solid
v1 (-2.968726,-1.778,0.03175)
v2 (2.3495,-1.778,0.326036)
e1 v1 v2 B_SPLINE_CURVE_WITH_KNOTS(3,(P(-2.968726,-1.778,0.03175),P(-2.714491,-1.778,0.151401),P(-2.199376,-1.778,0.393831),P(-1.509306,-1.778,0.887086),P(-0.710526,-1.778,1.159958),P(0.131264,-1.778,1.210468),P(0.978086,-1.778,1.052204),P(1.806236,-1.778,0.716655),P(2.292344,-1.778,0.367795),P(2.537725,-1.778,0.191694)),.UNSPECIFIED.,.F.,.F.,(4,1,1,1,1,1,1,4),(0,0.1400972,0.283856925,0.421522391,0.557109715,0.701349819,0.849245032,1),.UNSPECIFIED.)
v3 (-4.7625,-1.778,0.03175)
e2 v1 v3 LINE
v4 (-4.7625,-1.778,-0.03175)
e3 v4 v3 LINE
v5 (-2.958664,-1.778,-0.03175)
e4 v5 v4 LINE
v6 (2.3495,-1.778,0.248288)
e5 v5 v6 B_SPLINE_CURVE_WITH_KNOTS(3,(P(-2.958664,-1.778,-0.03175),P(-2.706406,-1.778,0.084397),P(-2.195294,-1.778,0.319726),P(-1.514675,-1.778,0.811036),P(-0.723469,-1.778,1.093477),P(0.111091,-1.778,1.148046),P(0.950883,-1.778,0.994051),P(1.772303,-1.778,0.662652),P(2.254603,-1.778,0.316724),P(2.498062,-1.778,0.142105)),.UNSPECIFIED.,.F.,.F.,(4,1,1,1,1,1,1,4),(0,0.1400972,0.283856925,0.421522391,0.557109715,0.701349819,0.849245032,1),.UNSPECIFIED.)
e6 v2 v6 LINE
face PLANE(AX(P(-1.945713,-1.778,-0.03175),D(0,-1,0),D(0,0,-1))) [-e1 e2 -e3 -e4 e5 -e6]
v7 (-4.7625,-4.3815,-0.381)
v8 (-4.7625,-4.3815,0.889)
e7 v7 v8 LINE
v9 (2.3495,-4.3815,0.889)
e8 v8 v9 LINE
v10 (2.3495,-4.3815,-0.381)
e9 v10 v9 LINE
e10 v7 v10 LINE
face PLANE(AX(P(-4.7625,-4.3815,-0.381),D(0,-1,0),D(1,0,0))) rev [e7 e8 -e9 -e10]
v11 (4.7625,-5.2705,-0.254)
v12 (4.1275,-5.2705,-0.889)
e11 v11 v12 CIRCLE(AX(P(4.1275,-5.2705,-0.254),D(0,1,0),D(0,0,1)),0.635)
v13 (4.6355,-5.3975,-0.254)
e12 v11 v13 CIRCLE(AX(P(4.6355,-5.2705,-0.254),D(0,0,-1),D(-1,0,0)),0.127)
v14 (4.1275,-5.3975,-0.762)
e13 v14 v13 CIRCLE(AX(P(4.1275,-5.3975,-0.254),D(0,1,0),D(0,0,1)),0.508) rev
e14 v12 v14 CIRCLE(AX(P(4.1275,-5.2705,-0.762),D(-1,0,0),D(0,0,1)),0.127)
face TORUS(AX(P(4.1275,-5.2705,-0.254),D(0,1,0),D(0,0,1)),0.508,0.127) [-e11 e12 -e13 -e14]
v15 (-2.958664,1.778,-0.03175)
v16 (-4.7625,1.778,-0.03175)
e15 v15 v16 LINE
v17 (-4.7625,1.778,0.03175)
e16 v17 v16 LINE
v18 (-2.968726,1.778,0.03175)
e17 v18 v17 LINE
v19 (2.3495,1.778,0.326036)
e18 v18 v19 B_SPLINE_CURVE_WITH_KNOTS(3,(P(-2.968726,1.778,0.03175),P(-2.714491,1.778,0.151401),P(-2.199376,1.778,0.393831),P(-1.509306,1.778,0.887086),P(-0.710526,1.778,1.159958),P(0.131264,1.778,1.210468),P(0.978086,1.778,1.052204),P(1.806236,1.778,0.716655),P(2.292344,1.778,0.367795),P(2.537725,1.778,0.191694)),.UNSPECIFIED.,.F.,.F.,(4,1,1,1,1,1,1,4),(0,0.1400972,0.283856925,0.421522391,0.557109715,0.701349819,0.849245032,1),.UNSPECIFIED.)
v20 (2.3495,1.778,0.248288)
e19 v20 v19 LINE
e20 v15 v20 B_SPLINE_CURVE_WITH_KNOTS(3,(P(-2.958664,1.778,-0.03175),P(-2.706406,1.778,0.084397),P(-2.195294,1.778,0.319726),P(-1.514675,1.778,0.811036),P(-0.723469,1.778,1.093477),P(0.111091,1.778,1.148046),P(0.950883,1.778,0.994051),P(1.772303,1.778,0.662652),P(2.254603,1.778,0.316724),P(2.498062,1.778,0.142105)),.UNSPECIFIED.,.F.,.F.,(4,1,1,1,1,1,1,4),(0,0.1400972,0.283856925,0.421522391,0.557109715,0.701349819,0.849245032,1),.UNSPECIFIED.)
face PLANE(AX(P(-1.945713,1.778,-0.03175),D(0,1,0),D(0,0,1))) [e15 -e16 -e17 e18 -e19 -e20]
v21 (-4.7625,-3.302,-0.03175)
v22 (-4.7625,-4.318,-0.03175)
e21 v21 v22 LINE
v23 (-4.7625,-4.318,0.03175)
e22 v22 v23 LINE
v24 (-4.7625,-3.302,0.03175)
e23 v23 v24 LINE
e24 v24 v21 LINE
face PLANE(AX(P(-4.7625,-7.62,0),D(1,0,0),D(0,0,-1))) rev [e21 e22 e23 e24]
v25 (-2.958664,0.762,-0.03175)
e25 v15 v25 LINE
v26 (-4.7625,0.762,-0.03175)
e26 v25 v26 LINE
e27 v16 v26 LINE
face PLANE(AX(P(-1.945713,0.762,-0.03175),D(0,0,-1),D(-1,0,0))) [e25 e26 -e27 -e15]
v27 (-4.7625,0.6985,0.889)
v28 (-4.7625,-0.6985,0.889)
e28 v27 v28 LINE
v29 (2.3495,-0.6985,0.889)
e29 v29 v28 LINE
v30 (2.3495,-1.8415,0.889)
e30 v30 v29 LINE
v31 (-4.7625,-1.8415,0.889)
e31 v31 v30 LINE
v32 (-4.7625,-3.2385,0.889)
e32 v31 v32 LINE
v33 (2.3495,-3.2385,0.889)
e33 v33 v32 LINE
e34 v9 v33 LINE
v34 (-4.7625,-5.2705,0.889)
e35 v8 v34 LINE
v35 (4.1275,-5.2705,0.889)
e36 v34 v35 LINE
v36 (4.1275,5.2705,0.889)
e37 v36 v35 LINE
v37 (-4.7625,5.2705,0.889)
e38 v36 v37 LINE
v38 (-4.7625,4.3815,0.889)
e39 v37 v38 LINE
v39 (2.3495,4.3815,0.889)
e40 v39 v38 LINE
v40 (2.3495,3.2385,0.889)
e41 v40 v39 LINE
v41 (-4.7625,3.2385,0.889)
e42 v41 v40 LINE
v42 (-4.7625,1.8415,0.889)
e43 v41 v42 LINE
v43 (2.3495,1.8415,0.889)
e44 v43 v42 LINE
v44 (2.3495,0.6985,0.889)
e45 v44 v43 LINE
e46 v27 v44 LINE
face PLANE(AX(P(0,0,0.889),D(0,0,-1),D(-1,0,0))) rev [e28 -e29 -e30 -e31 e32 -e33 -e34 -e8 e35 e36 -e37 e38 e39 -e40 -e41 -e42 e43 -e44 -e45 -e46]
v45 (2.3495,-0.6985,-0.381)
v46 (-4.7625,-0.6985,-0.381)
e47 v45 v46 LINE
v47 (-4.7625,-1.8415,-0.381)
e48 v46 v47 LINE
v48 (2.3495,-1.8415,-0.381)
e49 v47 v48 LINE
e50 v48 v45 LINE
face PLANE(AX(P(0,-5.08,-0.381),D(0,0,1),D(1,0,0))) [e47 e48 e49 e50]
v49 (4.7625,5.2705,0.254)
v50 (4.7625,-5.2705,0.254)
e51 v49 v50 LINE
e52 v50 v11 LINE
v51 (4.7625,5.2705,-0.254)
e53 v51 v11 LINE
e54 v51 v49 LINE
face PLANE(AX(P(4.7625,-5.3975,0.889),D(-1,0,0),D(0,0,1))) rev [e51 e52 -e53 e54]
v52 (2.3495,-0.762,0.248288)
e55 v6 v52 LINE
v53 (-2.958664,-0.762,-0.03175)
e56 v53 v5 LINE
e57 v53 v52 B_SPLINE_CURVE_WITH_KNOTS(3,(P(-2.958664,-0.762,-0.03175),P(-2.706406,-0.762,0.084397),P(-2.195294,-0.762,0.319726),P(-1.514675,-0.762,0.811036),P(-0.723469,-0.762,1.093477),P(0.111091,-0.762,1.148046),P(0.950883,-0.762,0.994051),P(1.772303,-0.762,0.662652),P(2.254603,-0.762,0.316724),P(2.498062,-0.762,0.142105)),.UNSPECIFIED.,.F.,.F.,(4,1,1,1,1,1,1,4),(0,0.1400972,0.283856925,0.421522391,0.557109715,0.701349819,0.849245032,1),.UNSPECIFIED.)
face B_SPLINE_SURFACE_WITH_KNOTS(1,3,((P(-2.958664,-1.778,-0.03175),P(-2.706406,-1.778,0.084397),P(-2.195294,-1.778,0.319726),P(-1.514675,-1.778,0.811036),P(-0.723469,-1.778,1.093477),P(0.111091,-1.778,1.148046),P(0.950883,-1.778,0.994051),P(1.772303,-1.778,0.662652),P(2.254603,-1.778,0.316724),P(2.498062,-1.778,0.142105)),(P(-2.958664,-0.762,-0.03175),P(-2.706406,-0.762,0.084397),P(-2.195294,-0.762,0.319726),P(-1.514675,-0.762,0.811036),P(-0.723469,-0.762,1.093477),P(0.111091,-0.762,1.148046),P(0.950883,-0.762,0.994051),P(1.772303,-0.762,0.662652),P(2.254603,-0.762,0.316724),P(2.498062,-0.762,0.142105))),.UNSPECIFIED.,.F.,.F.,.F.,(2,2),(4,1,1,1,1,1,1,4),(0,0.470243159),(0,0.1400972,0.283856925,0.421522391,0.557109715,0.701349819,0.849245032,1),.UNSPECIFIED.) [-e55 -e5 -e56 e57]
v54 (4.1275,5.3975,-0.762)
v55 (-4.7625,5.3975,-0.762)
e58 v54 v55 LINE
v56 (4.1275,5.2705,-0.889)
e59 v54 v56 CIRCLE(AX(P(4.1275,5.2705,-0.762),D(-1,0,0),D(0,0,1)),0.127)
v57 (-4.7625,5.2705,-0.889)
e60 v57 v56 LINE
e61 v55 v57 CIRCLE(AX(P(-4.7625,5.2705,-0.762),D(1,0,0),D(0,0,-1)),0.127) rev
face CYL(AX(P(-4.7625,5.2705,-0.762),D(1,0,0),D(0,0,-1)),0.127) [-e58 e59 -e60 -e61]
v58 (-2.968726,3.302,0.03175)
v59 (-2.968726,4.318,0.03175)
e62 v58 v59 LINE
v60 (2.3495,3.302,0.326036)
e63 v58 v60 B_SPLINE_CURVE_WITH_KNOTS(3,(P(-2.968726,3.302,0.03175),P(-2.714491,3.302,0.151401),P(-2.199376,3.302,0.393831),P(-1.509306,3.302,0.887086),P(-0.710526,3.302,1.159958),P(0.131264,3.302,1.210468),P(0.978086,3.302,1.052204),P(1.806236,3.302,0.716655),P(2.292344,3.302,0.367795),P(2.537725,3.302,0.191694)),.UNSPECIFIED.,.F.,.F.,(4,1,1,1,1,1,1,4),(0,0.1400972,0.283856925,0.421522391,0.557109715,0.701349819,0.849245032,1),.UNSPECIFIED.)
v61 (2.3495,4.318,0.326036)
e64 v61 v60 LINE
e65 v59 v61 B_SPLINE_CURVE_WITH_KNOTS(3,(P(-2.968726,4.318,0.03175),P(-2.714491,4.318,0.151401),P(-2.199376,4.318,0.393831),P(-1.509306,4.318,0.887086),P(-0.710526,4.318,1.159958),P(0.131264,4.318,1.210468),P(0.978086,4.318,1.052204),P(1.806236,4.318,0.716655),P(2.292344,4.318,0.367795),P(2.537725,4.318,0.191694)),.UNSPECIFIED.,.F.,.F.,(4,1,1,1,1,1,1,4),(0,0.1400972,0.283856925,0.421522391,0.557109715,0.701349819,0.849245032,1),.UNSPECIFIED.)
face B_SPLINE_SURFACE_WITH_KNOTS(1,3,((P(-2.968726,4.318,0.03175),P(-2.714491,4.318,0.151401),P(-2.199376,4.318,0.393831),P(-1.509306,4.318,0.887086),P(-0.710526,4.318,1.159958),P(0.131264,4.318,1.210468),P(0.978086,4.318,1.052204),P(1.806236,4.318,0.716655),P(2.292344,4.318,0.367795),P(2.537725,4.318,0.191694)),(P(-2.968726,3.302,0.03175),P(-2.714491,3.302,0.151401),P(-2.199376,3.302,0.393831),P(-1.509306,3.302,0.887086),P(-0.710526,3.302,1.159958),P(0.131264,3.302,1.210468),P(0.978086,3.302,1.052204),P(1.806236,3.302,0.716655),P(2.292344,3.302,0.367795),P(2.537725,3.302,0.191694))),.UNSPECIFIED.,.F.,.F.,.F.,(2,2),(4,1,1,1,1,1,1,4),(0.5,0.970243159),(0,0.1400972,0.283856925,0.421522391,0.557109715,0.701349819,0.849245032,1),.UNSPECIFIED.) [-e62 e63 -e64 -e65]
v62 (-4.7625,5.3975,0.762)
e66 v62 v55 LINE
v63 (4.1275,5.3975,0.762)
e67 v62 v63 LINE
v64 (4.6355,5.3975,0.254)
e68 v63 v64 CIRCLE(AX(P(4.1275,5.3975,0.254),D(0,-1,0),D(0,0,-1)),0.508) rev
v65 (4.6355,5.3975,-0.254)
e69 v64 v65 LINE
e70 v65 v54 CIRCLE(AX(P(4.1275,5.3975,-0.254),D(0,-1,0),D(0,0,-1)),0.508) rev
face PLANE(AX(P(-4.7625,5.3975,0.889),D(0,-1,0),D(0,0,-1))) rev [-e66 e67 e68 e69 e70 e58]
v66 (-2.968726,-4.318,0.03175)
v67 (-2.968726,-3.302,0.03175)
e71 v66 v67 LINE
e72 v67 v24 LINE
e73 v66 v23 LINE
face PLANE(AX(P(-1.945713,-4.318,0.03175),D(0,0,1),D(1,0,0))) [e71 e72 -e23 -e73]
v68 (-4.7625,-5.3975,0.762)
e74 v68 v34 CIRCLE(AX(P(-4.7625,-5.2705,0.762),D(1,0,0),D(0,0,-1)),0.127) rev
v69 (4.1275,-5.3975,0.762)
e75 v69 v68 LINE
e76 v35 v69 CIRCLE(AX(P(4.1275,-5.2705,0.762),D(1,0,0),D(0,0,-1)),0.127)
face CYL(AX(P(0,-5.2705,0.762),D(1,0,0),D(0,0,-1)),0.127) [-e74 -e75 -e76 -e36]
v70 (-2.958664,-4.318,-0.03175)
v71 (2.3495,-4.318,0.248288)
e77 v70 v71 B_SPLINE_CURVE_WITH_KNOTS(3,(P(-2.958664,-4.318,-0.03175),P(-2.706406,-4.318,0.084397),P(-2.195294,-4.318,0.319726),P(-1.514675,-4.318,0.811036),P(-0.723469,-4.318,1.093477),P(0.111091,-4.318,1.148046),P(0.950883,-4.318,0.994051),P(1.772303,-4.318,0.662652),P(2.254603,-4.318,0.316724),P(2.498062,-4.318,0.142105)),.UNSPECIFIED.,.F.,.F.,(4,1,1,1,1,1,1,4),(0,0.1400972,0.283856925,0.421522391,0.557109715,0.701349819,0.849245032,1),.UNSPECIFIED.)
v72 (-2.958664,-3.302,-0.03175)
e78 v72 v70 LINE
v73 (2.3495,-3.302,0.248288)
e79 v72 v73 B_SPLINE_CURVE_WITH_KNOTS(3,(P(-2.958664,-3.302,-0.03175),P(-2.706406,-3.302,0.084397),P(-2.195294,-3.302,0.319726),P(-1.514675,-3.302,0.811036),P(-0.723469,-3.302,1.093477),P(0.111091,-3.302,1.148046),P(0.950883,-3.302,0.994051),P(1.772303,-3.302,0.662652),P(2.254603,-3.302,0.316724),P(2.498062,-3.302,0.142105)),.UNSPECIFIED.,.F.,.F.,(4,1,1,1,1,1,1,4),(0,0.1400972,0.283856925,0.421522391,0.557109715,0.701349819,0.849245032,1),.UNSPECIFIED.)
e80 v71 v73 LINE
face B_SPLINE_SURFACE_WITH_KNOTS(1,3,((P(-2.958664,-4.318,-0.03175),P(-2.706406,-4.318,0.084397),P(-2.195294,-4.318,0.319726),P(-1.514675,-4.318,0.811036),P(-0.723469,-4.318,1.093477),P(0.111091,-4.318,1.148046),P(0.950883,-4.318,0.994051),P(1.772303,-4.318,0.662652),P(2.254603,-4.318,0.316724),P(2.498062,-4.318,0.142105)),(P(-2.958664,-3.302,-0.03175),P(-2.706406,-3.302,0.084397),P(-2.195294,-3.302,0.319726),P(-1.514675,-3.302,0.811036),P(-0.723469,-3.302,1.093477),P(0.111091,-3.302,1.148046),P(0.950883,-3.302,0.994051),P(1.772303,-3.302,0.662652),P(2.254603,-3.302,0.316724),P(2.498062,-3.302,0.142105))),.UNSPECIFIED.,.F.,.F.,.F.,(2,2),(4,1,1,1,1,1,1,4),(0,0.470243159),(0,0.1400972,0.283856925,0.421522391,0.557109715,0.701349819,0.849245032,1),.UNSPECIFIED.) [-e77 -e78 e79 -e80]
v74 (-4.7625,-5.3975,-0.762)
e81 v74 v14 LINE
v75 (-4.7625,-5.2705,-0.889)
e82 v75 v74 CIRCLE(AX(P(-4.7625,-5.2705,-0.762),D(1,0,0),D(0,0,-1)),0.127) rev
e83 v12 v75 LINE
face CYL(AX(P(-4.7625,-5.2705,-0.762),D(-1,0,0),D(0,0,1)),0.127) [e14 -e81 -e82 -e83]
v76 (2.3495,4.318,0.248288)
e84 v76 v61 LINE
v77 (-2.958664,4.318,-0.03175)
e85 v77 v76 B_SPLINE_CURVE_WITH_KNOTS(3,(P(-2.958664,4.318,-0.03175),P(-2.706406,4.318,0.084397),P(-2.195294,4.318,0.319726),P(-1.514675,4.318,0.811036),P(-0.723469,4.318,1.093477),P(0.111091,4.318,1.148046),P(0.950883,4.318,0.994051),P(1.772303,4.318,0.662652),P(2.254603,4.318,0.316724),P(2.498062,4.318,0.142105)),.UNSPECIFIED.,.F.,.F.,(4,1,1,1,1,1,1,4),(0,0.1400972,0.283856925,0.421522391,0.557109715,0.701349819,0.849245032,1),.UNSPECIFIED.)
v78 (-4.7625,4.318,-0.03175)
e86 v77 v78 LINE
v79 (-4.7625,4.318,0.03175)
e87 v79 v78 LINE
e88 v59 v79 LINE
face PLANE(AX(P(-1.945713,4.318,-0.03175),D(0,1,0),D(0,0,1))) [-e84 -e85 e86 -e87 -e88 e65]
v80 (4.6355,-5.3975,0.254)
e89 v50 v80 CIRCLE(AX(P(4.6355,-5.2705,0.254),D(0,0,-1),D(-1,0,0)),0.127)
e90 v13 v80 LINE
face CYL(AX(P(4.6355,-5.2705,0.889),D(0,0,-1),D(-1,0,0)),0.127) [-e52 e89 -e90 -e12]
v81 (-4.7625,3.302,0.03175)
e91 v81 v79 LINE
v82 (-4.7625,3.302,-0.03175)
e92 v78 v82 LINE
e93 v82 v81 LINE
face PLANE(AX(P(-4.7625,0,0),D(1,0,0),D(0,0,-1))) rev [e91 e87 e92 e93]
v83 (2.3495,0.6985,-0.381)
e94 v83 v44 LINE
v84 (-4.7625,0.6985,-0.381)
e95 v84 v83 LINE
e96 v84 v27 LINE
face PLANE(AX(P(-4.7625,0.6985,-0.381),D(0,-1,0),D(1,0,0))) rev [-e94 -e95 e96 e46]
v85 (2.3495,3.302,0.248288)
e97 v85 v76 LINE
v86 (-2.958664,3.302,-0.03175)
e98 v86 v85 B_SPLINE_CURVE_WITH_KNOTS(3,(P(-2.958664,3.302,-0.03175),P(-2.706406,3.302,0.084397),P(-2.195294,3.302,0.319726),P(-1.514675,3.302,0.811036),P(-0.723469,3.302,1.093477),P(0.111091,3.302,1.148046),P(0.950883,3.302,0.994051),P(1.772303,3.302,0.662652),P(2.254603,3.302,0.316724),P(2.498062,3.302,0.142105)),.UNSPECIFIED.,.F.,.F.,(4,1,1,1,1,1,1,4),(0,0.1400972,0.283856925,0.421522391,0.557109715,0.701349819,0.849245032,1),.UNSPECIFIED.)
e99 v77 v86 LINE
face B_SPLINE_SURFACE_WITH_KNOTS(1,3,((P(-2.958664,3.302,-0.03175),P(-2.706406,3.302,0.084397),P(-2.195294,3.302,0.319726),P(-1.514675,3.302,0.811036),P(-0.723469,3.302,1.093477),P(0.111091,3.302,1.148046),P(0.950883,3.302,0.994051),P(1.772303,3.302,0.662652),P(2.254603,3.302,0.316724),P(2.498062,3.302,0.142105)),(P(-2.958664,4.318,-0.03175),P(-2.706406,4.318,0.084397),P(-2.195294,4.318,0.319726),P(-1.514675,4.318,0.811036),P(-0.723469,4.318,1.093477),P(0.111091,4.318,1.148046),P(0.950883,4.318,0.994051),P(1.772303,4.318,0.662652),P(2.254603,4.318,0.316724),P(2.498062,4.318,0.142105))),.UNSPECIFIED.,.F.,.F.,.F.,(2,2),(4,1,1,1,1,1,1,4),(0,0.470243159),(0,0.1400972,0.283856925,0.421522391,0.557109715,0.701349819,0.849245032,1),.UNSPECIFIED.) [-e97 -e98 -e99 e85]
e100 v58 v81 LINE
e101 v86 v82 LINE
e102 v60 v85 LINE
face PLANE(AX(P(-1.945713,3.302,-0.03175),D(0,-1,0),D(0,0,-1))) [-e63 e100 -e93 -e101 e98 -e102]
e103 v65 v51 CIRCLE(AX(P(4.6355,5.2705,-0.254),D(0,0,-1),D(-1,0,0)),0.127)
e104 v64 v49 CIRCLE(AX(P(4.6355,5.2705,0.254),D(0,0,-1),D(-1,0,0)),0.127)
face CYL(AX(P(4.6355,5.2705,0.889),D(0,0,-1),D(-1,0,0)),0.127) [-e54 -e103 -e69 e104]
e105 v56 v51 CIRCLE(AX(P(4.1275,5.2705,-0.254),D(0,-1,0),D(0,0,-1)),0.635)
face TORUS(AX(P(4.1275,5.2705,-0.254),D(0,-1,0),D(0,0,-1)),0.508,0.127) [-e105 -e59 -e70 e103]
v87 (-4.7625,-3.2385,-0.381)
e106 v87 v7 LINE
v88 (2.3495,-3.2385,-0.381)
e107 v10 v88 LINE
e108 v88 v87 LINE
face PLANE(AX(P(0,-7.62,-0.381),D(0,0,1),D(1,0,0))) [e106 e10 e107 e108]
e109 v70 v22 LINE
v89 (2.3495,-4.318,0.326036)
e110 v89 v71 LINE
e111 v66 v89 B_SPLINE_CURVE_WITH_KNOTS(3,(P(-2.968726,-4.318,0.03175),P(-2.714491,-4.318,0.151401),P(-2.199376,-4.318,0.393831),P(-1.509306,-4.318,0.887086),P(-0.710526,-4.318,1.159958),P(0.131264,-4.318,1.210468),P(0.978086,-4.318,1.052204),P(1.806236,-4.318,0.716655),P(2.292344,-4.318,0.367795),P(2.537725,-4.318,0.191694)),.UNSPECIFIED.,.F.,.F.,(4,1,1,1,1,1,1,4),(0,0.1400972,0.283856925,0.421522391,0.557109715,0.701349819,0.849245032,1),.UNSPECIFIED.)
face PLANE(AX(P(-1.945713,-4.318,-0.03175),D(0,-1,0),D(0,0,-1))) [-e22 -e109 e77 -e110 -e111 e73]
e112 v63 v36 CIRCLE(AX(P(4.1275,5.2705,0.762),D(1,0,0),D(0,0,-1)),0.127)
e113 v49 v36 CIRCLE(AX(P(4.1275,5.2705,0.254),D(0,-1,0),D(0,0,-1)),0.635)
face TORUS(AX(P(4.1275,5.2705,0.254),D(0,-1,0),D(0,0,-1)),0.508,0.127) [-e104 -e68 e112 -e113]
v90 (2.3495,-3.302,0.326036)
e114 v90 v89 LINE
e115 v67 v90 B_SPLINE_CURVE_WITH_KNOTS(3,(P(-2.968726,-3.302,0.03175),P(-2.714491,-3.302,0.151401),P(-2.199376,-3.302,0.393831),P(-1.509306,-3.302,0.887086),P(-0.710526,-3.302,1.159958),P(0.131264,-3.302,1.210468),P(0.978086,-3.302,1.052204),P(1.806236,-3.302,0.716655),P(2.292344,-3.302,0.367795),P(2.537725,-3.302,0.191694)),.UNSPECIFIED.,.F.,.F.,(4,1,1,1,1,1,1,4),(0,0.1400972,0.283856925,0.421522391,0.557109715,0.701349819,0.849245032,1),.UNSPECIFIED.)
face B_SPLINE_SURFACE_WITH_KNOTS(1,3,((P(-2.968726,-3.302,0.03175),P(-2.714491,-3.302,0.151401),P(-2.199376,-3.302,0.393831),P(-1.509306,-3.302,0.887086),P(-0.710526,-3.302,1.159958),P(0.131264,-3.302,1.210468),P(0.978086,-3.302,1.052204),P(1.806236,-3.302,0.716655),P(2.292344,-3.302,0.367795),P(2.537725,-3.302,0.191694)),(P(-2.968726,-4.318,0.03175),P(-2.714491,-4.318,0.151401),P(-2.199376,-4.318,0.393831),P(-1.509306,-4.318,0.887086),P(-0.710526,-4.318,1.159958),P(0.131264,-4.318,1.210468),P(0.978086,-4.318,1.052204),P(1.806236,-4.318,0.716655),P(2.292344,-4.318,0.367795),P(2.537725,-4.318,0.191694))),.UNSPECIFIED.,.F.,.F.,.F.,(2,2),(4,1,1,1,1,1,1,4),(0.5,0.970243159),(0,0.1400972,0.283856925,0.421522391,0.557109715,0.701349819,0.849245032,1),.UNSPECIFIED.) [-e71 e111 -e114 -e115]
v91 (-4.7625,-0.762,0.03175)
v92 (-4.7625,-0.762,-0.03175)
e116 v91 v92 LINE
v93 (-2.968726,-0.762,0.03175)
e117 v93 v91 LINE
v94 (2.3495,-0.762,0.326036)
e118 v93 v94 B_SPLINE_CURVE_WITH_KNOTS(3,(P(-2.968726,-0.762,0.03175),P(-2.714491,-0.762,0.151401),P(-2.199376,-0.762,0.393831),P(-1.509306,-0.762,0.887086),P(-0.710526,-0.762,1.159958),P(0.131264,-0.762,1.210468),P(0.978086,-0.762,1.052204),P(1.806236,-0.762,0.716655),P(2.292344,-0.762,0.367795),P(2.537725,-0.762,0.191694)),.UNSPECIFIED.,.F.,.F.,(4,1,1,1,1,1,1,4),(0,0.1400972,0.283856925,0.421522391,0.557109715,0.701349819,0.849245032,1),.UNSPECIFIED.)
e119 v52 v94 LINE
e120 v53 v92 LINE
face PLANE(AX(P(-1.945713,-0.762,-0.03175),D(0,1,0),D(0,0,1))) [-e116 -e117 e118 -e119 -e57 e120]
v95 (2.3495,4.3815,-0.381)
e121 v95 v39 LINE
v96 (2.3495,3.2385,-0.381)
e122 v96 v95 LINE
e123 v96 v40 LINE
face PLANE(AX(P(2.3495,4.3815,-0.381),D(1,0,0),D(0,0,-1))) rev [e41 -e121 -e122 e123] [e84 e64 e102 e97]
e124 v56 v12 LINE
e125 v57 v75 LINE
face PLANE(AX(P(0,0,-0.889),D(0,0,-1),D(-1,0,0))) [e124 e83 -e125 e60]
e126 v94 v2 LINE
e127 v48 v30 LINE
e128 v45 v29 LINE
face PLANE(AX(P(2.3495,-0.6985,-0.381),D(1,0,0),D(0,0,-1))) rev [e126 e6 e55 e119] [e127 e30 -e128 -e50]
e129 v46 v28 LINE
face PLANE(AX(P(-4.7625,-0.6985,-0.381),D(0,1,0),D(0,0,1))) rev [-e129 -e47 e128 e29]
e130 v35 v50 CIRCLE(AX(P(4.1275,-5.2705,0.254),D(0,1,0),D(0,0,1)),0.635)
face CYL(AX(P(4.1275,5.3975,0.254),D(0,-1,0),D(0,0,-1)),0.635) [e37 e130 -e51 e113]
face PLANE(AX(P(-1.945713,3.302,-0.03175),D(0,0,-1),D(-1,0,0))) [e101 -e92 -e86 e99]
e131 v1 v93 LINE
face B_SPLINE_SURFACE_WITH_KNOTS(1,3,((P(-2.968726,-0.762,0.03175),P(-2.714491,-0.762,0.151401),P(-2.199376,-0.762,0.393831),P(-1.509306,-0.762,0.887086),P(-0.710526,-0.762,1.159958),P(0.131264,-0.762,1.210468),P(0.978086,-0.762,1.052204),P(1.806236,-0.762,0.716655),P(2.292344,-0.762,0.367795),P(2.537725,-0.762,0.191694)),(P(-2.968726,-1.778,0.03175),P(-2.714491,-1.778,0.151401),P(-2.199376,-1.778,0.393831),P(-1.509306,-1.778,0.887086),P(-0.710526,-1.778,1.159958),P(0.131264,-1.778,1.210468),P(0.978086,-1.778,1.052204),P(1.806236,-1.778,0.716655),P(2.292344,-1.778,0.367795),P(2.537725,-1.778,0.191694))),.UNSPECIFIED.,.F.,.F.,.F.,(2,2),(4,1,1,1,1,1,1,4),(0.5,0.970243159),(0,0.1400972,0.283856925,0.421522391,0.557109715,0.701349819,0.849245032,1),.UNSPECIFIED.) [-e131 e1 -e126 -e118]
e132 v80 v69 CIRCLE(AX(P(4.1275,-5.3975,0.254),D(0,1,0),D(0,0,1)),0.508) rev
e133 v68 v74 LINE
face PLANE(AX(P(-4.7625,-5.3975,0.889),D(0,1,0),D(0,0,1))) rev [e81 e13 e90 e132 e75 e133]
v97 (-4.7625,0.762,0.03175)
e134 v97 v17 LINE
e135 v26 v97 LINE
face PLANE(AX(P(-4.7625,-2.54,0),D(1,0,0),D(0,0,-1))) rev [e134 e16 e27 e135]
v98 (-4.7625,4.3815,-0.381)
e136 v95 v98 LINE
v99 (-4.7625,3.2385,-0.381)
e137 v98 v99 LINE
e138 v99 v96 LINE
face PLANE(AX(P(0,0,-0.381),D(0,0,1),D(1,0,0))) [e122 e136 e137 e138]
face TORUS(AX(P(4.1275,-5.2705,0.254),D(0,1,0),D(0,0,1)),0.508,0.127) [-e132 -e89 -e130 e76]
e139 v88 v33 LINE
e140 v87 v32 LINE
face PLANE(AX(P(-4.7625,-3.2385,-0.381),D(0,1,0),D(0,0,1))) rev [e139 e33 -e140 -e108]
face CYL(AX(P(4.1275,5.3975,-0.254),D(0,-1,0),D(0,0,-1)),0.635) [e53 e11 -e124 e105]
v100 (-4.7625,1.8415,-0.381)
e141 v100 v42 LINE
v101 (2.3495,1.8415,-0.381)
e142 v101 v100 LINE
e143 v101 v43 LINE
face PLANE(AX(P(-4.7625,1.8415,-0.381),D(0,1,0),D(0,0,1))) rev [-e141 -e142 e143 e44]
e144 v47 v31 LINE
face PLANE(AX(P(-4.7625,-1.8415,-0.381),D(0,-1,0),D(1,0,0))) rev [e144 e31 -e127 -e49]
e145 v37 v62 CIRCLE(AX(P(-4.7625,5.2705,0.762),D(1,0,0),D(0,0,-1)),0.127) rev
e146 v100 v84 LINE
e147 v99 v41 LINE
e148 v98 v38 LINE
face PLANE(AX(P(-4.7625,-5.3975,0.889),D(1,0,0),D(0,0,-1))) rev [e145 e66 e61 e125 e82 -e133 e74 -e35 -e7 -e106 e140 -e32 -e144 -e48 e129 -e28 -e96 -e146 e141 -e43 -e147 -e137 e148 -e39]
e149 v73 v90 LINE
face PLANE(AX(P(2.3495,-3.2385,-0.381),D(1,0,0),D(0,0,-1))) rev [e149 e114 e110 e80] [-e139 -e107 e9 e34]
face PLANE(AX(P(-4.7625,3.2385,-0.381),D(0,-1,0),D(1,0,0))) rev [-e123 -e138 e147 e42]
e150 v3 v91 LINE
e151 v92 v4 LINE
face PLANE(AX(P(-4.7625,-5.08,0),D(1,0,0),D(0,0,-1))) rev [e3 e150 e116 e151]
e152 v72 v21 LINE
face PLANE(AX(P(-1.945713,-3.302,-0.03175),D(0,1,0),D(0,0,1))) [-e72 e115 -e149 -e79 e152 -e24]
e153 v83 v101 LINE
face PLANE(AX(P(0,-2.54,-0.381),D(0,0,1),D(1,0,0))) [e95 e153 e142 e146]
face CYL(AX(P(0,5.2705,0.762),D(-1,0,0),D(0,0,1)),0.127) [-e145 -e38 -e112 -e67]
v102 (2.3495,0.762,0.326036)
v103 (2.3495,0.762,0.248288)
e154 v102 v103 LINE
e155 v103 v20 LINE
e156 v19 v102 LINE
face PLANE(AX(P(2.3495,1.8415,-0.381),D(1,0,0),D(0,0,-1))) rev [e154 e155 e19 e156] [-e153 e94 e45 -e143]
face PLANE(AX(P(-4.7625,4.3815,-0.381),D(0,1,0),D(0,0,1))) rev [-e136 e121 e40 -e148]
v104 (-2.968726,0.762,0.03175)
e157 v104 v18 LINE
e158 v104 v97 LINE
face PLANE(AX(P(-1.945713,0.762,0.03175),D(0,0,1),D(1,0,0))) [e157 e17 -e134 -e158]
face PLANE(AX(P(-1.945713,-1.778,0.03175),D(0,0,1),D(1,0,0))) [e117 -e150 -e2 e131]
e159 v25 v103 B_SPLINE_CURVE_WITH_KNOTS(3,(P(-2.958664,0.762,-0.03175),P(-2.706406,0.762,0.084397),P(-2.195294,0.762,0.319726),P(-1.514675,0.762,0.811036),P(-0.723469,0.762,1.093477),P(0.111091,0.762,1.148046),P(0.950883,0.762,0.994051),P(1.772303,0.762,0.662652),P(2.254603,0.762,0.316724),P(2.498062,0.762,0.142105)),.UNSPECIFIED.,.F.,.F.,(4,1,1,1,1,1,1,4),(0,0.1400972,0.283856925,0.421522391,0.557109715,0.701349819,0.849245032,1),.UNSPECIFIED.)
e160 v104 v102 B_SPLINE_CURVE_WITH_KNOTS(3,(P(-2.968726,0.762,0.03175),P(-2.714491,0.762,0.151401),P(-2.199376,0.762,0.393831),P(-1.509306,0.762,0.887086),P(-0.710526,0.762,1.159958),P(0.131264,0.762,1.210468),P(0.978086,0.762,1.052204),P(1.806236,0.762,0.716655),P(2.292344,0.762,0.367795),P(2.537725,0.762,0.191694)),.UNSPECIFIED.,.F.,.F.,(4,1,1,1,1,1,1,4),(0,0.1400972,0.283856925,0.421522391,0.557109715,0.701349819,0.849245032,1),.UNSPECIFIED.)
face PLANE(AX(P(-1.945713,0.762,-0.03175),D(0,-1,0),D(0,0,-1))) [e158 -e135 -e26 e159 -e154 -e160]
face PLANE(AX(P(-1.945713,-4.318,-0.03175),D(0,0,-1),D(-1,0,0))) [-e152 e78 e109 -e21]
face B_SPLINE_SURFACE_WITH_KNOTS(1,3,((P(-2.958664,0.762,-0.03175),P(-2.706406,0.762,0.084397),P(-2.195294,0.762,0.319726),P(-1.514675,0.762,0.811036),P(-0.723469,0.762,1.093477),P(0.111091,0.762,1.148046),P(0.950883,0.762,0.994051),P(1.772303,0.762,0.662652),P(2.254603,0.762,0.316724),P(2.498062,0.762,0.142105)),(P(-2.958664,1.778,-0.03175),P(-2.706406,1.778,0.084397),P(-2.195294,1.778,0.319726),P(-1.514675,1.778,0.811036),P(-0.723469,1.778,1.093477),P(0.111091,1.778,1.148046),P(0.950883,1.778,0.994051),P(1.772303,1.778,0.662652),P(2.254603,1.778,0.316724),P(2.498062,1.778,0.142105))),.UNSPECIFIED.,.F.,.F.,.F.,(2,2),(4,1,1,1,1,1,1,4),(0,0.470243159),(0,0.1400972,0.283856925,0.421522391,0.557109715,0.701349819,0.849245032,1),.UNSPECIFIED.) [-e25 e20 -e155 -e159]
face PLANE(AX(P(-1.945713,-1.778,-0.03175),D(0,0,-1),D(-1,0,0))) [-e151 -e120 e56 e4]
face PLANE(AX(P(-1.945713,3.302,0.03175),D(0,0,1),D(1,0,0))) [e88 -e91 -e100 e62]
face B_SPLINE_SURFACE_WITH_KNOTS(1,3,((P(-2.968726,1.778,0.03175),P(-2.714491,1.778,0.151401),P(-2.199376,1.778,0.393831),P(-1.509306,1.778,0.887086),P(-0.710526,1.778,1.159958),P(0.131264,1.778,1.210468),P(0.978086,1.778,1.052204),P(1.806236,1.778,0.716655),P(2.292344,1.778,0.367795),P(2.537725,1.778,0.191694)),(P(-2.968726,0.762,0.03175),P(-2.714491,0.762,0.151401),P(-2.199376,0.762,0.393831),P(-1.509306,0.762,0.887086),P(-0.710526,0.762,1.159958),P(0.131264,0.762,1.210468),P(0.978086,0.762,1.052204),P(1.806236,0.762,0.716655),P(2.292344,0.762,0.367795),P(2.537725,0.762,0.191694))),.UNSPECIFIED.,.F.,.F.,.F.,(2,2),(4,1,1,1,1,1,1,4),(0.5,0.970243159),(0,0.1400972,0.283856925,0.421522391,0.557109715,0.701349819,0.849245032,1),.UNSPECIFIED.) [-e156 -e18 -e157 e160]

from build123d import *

# Parameters (mm, degrees)
SKETCH1_W           = 9.525
SKETCH1_H           = 10.795
BOSS_EXTRUDE1_DEPTH = 0.889
SKETCH2_W           = 7.112
SKETCH2_H           = 1.143
CUT_EXTRUDE1_DEPTH  = 1.27
LPATTERN1_COUNT     = 4
LPATTERN1_PITCH     = 2.54
SWEEP1_START        = 3.302
SWEEP1_DEPTH        = 1.016
LPATTERN2_COUNT     = 4
LPATTERN2_PITCH     = 2.54
CUT_EXTRUDE2_DEPTH  = 12.8580274
FILLET2_R           = 0.127


# Read off the part's stored shape, not the designer's step: Sweep1
with BuildPart() as part:
    # Sketch1 → Boss-Extrude1 (new, symmetric)
    with BuildSketch(Plane.XY):
        Rectangle(SKETCH1_W, SKETCH1_H)
    extrude(amount=BOSS_EXTRUDE1_DEPTH, both=True)

    # Sketch2 → Cut-Extrude1 (cut)
    with BuildSketch(Plane.XY.offset(0.889)):
        with Locations((-1.2065, 3.81)):
            Rectangle(SKETCH2_W, SKETCH2_H)
    cut_extrude1 = extrude(amount=-CUT_EXTRUDE1_DEPTH, mode=Mode.SUBTRACT)

    # LPattern1: Cut-Extrude1 ×4
    with Locations(*[(0, -i * LPATTERN1_PITCH, 0) for i in range(1, LPATTERN1_COUNT)]):
        add(cut_extrude1, mode=Mode.SUBTRACT)

    # Sweep1 outline → Sweep1 (add)
    with BuildSketch(Plane(origin=(0, 0, 0), x_dir=(1, 0, 0), z_dir=(0, 1, 0)).offset(SWEEP1_START)):
        with BuildLine():
            add(Edge.make_bspline(
                [(-2.958664485, 0.03175), (-2.706405798, -0.084396657), (-2.195293689, -0.319726362), (-1.514674501, -0.811036045), (-0.723468732, -1.093477281), (0.111091297, -1.1480463), (0.950883413, -0.99405052), (1.715489301, -0.68557292), (2.154910348, -0.386399802), (2.3495, -0.248288405)],
                knots=[0, 0, 0, 0, 0.1400972, 0.283856925, 0.421522391, 0.557109715, 0.701349819, 0.849245032, 0.969367335, 0.969367335, 0.969367335, 0.969367335], degree=3))
            Line((-2.958664485, 0.03175), (-4.7625, 0.03175))
            Line((-4.7625, 0.03175), (-4.7625, -0.03175))
            Line((-4.7625, -0.03175), (-2.968725914, -0.03175))
            add(Edge.make_bspline(
                [(-2.968725914, -0.03175), (-2.714491455, -0.15140088), (-2.19937615, -0.393830641), (-1.50930601, -0.887085656), (-0.710525949, -1.159958237), (0.131263589, -1.2104677), (0.978085908, -1.052203574), (1.73427594, -0.74581201), (2.165863748, -0.455666821), (2.3495, -0.326036057)],
                knots=[0, 0, 0, 0, 0.1400972, 0.283856925, 0.421522391, 0.557109715, 0.701349819, 0.849245032, 0.961516171, 0.961516171, 0.961516171, 0.961516171], degree=3))
            Line((2.3495, -0.326036057), (2.3495, -0.248288405))
        make_face()
    sweep1 = extrude(amount=SWEEP1_DEPTH)

    # LPattern2: Sweep1 ×4
    with Locations(*[(0, -i * LPATTERN2_PITCH, 0) for i in range(1, LPATTERN2_COUNT)]):
        add(sweep1)

    # Sketch5 → Cut-Extrude2 (cut, through all)
    with BuildSketch(Plane.XZ.offset(5.3975)):
        with BuildLine():
            Line((4.1275, 0.889), (4.830136411, 0.889))
            Line((4.830136411, 0.889), (4.830136411, -0.889))
            Line((4.830136411, -0.889), (4.1275, -0.889))
            ThreePointArc((4.1275, -0.889), (4.576512806, -0.703012806), (4.7625, -0.254))
            Line((4.7625, -0.254), (4.7625, 0.254))
            ThreePointArc((4.7625, 0.254), (4.576512806, 0.703012806), (4.1275, 0.889))
        make_face()
    extrude(amount=-CUT_EXTRUDE2_DEPTH, mode=Mode.SUBTRACT)

    # Fillet2
    fillet2_edges = [part.edges().sort_by_distance(p)[0] for p in [
        (-0.3175, -5.3975, 0.889),
        (-0.3175, 5.3975, -0.889),
        (-0.3175, 5.3975, 0.889),
        (4.7625, -5.3975, 0),
        (4.7625, 5.3975, 0),
        (4.576512806, -5.3975, 0.703012806),
        (4.576512806, -5.3975, -0.703012806),
        (4.576512806, 5.3975, -0.703012806),
        (4.576512806, 5.3975, 0.703012806),
        (-0.3175, -5.3975, -0.889),
    ]]
    fillet(fillet2_edges, radius=FILLET2_R)


solid = part.part
